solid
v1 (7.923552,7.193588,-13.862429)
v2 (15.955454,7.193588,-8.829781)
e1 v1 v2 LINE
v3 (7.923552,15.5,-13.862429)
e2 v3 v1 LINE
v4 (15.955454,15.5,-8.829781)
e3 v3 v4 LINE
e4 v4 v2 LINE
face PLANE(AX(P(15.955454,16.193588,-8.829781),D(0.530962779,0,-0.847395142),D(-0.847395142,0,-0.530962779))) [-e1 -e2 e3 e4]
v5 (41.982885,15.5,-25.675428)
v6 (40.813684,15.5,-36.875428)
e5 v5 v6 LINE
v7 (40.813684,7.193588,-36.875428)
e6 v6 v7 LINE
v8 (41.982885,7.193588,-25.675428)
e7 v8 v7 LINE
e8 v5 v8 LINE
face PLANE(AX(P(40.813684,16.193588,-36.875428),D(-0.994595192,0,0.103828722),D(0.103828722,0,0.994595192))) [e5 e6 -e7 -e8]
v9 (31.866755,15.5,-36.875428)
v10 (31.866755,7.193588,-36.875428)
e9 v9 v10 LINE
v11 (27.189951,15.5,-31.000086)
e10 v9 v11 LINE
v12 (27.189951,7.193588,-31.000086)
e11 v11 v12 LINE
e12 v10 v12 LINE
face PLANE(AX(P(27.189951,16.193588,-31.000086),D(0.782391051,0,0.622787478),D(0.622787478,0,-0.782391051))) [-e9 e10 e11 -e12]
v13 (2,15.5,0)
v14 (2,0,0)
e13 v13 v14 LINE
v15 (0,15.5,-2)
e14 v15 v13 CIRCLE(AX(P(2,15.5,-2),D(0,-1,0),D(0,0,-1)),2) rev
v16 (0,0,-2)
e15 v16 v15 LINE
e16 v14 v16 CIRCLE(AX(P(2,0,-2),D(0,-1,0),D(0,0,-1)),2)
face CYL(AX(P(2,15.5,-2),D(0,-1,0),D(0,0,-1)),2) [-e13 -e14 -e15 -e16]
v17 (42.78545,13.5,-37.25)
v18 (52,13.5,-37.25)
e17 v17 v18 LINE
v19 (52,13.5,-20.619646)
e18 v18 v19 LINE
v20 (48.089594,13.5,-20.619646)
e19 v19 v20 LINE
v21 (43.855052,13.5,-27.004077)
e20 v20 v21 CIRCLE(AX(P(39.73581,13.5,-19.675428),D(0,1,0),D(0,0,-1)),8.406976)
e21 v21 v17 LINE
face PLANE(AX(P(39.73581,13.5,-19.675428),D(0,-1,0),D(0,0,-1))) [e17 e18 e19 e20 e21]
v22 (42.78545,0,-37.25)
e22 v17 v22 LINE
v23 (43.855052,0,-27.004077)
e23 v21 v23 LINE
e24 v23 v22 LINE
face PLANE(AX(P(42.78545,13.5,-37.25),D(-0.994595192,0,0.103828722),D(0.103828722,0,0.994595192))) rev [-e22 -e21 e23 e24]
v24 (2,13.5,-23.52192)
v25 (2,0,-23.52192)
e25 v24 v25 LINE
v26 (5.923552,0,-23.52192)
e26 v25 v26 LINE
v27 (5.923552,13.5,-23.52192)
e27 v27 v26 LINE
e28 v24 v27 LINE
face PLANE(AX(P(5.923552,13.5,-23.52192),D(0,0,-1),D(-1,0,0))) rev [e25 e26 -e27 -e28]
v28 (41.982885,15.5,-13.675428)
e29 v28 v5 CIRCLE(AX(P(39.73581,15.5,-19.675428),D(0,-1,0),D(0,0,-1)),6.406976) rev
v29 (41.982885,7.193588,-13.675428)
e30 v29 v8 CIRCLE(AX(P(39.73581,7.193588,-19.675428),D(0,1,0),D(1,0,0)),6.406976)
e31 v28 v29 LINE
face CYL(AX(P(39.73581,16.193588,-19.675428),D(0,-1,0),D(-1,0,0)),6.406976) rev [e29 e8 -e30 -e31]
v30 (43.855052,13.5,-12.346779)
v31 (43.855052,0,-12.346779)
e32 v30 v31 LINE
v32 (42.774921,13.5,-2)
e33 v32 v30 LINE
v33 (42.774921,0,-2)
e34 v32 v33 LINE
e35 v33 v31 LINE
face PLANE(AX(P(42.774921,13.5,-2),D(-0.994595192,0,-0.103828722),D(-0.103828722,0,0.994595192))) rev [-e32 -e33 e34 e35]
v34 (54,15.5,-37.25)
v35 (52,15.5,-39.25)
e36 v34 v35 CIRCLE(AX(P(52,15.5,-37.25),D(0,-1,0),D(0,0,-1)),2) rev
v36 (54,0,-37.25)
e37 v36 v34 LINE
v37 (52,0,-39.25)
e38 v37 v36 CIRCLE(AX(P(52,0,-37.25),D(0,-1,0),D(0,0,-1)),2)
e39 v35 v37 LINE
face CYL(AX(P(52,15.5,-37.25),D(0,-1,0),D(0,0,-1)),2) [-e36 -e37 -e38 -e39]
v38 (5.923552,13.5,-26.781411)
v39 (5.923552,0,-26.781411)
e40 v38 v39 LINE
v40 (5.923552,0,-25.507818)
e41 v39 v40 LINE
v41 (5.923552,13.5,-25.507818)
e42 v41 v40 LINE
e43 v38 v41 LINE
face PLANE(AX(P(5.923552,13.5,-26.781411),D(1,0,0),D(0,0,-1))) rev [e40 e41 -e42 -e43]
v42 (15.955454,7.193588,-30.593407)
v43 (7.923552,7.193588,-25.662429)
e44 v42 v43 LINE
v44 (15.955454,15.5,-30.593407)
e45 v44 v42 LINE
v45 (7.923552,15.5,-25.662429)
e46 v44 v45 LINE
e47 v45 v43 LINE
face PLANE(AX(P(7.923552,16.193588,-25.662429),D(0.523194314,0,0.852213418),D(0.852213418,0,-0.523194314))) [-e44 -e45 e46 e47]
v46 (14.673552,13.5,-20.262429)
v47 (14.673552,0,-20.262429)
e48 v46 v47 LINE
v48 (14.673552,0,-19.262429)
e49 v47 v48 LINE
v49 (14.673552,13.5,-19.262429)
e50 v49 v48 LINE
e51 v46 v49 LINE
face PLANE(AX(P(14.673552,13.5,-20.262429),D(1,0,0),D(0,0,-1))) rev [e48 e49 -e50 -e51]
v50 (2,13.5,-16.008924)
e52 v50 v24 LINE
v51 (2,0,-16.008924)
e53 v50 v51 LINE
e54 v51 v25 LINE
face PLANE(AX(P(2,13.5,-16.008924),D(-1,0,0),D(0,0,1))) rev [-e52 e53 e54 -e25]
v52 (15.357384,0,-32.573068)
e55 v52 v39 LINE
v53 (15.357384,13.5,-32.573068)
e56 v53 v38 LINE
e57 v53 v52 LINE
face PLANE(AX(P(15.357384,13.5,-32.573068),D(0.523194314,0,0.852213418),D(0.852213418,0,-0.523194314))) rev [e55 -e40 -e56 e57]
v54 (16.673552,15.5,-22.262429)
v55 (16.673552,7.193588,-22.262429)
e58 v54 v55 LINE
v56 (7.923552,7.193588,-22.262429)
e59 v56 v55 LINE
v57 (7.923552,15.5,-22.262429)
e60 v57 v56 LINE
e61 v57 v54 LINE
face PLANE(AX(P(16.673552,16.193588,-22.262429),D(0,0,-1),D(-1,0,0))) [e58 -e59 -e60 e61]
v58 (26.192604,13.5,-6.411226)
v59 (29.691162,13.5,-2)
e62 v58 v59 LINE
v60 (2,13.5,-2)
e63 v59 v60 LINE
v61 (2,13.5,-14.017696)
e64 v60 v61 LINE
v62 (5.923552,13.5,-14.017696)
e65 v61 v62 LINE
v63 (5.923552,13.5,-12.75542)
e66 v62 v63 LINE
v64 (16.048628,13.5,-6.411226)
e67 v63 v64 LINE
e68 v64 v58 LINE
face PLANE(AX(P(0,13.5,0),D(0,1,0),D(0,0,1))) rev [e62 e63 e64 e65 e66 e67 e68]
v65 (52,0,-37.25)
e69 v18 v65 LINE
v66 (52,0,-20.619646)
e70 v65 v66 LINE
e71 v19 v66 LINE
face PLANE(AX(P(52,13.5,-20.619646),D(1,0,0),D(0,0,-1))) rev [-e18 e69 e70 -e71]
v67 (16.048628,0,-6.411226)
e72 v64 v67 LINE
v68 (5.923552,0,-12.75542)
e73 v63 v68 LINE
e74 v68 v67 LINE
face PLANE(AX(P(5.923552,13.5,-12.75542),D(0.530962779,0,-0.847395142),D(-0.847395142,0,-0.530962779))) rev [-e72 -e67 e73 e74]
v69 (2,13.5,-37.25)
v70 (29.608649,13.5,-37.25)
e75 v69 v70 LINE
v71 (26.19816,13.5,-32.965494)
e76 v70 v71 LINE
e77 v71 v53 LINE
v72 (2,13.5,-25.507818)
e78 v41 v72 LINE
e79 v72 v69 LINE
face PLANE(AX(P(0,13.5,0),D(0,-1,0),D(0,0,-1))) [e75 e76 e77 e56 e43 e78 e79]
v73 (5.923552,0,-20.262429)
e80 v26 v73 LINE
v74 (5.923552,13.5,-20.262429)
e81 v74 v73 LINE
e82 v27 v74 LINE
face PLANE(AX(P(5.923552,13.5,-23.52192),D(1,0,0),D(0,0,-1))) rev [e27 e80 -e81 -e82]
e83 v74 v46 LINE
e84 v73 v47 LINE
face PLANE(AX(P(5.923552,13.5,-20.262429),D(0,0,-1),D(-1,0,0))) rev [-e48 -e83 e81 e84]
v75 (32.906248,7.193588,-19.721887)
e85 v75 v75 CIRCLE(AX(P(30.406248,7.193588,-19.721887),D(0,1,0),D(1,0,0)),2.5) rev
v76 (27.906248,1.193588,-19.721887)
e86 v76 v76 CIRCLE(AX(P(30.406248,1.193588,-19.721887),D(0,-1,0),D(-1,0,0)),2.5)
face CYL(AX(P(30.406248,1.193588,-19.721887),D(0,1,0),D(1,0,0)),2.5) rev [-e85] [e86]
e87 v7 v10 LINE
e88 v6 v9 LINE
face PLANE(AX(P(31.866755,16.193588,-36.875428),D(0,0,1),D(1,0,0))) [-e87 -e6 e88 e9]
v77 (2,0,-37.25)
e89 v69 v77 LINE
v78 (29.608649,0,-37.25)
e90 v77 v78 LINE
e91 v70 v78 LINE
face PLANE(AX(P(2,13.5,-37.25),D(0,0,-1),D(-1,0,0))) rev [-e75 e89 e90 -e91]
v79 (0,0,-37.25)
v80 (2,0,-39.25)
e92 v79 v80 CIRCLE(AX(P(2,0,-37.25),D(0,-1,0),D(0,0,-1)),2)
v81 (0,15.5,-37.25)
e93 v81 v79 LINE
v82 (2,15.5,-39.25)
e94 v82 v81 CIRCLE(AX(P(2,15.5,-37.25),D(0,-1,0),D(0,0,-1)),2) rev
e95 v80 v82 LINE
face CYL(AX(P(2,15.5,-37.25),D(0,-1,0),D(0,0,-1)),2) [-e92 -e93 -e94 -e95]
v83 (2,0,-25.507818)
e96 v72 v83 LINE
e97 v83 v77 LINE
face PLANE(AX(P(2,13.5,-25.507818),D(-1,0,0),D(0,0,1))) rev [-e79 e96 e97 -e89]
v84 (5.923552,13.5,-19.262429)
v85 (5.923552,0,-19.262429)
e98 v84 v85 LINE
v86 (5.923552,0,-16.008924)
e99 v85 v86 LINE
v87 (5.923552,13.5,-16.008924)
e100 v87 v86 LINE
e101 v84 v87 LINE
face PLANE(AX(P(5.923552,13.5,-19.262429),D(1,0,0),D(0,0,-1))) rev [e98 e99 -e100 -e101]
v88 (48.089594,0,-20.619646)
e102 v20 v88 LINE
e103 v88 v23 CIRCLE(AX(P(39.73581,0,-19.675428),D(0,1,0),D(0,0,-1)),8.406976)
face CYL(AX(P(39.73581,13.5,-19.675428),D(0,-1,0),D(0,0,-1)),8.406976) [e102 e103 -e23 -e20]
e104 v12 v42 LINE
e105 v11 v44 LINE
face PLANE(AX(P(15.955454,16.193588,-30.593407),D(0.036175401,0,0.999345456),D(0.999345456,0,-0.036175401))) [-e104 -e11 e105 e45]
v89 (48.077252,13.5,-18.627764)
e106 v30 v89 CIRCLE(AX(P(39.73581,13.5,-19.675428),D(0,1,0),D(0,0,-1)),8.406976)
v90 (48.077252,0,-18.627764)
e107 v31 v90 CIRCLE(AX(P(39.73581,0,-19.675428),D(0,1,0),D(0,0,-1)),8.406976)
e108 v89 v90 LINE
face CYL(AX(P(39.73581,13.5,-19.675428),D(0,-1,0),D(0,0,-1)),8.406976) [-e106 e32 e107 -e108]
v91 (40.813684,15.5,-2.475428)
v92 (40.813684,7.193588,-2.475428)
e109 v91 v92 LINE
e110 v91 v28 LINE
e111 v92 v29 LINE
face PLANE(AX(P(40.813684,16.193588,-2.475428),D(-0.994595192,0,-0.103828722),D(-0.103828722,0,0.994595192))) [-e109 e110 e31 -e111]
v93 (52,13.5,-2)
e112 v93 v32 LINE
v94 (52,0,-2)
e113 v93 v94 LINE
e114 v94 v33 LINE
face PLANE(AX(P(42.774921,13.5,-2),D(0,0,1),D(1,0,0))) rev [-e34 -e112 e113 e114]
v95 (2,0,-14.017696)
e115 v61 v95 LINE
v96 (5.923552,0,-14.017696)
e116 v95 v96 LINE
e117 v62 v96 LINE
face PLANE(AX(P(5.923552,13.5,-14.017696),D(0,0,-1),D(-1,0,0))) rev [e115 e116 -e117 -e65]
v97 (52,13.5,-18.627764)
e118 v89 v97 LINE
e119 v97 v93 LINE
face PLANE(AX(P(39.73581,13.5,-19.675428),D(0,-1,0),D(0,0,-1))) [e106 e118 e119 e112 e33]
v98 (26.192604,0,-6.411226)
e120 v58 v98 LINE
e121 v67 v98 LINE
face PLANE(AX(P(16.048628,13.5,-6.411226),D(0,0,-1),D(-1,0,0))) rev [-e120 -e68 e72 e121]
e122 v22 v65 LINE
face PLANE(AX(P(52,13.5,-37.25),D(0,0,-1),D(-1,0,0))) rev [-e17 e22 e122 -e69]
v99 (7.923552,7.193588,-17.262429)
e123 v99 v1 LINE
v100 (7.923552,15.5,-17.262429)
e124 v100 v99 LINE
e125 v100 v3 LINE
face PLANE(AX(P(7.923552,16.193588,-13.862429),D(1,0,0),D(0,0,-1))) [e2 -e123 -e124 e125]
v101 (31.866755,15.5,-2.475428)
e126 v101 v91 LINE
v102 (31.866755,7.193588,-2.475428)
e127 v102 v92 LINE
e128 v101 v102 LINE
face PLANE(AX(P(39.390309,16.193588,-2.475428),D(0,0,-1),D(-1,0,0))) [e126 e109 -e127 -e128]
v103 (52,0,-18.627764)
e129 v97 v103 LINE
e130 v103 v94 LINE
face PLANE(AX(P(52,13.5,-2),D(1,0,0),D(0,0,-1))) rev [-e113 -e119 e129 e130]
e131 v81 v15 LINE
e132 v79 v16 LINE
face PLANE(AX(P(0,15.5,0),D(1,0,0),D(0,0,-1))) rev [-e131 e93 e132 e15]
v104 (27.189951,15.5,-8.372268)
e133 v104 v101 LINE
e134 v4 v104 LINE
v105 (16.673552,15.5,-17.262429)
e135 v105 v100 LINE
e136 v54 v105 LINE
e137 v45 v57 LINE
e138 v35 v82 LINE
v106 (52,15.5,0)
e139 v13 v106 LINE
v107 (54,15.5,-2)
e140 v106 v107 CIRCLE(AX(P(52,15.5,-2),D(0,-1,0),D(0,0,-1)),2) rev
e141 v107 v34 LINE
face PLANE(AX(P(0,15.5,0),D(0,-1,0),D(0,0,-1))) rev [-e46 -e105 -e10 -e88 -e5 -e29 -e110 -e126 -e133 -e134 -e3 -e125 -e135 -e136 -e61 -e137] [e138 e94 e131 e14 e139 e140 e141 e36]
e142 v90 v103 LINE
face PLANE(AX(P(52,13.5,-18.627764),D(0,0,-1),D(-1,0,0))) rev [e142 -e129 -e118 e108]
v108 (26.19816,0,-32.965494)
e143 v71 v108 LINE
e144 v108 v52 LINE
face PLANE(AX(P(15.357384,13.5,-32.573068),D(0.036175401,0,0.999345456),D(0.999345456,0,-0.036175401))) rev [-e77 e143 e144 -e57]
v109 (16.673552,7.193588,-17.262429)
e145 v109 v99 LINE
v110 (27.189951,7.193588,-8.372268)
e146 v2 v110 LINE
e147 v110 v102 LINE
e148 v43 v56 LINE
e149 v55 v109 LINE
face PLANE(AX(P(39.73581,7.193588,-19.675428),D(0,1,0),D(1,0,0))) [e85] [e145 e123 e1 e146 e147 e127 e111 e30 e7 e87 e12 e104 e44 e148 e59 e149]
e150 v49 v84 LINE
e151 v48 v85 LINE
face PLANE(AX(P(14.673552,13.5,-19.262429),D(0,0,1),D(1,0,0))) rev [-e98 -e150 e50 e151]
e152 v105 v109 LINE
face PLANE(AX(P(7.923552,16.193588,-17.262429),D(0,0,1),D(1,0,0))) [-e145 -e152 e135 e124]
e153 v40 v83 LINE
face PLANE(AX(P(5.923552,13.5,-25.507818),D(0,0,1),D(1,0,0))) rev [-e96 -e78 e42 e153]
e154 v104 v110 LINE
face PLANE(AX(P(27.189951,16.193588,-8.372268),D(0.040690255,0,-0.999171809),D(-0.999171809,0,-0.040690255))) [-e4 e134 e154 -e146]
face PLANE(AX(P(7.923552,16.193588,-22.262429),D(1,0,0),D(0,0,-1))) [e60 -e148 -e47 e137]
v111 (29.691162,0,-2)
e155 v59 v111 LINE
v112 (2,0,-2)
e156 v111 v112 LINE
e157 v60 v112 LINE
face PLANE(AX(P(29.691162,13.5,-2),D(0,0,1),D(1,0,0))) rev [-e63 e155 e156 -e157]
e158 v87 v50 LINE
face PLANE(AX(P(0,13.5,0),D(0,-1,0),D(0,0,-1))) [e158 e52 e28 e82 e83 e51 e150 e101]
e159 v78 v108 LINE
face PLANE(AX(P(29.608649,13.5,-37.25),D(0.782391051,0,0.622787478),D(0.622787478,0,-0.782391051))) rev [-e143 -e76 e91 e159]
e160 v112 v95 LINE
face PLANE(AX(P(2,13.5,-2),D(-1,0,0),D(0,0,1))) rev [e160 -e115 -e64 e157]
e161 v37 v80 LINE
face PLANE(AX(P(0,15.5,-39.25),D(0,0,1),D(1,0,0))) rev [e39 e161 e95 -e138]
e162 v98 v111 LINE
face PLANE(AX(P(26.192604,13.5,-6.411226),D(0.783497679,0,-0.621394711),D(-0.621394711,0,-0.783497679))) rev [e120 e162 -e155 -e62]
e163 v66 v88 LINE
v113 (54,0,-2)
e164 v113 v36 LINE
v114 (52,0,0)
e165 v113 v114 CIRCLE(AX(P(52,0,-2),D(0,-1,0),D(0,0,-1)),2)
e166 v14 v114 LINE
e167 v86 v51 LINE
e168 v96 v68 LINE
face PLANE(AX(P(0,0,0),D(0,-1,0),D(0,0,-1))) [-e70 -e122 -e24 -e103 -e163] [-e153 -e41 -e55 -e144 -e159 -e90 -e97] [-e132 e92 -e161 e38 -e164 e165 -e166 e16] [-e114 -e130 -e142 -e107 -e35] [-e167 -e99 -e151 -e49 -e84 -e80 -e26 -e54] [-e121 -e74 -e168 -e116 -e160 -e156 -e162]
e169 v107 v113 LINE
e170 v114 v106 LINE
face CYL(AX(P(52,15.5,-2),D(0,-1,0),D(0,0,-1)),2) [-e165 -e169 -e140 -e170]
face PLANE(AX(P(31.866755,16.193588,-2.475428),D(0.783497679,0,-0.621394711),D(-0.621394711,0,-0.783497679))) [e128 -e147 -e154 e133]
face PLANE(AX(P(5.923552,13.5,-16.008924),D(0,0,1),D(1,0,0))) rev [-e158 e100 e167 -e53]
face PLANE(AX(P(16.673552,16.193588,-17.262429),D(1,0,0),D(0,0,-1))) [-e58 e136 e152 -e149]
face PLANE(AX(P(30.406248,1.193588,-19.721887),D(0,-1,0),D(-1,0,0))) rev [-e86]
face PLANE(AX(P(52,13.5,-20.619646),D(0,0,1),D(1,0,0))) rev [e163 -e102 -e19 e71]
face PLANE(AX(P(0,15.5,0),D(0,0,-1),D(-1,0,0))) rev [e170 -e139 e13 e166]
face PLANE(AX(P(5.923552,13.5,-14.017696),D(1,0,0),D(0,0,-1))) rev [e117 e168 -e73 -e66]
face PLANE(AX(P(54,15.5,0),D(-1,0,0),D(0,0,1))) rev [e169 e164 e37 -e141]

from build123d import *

# Parameters (mm, degrees)
SKETCH1_W              = 54
SKETCH1_H              = 39.25
BOSS_EXTRUDE1_DEPTH    = 15.5
FILLET1_R              = 2
FILLET2_R              = 2
M3_A_START             = -3.329776532
M3_A_BLANK_DEPTH       = 9
M3_A_START_2           = -9.329776532
M3_A_BLANK_2_OUTLINE_R = 2.5
M3_A_BLANK_2_DEPTH     = 6
BODY_MOVE_COPY6_ANGLE  = 90
CUT_EXTRUDE1_DEPTH     = 13.5


with BuildPart() as part:
    # Sketch1 → Boss-Extrude1 (new body)
    with BuildSketch(Plane(origin=(0, 0, 0), x_dir=(1, 0, 0), z_dir=(0, 1, 0))):
        with Locations((27, 19.625)):
            Rectangle(SKETCH1_W, SKETCH1_H)
    extrude(amount=BOSS_EXTRUDE1_DEPTH)

    # Fillet1
    fillet1_edges = [part.edges().sort_by_distance(p)[0] for p in [
        (0, 7.75, 0),
    ]]
    fillet(fillet1_edges, radius=FILLET1_R)

    # Fillet2
    fillet2_edges = [part.edges().sort_by_distance(p)[0] for p in [
        (0, 7.75, -39.25),
        (54, 7.75, -39.25),
        (54, 7.75, 0),
    ]]
    fillet(fillet2_edges, radius=FILLET2_R)


with BuildPart() as body_2:
    # M3-A Blank: read off the stored shape, not the designer's step
    # M3-A Blank outline → M3-A Blank (new body)
    with BuildSketch(Plane(origin=(0, 0, 0), x_dir=(1, 0, 0), z_dir=(0, 1, 0)).offset(M3_A_START)):
        with BuildLine():
            Line((-41.581939277, 43.861919588), (-30.381939277, 42.692718591))
            ThreePointArc((-30.381939277, 42.692718591), (-24.381939277, 38.532817401), (-18.381939277, 42.692718591))
            Line((-18.381939277, 42.692718591), (-7.181939277, 43.861919588))
            Line((-7.181939277, 43.861919588), (-7.181939277, 52.808848959))
            Line((-7.181939277, 52.808848959), (-13.057281533, 57.485652948))
            Line((-13.057281533, 57.485652948), (-13.463960141, 68.720149487))
            Line((-13.463960141, 68.720149487), (-18.39493826, 76.75205199))
            Line((-18.39493826, 76.75205199), (-21.79493826, 76.75205199))
            Line((-21.79493826, 76.75205199), (-21.79493826, 68.00205199))
            Line((-21.79493826, 68.00205199), (-26.79493826, 68.00205199))
            Line((-26.79493826, 68.00205199), (-26.79493826, 76.75205199))
            Line((-26.79493826, 76.75205199), (-30.19493826, 76.75205199))
            Line((-30.19493826, 76.75205199), (-35.227586031, 68.720149487))
            Line((-35.227586031, 68.720149487), (-35.685099465, 57.485652948))
            Line((-35.685099465, 57.485652948), (-41.581939277, 52.808848959))
            Line((-41.581939277, 52.808848959), (-41.581939277, 43.861919588))
        make_face()
    extrude(amount=M3_A_BLANK_DEPTH)

    # M3-A Blank 2 outline → M3-A Blank 2 (add)
    with BuildSketch(Plane(origin=(0, 0, 0), x_dir=(1, 0, 0), z_dir=(0, 1, 0)).offset(M3_A_START_2)):
        with Locations((-24.335480832, 54.269355582)):
            Circle(M3_A_BLANK_2_OUTLINE_R)
    extrude(amount=M3_A_BLANK_2_DEPTH)


with BuildPart() as body_2_1:
    # Body-Move/Copy4: moved
    add(body_2.part.moved(Location((42.5, 8.919688157, 37.96700657))))


with BuildPart() as body_2_2:
    # Body-Move/Copy5: moved
    add(body_2_1.part.moved(Location((8.915108254, 0, 0))))


with BuildPart() as body_2_3:
    # Body-Move/Copy6: moved
    add(body_2_2.part.rotate(Axis((27.033168977, 0, -19.675428126), (0, 1, 0)), BODY_MOVE_COPY6_ANGLE))


with BuildPart() as body_2_4:
    # Body-Move/Copy7: moved
    add(body_2_3.part.moved(Location((0, 1.103676274, 0))))


with BuildPart() as body_2_5:
    # Body-Move/Copy8: moved
    add(body_2_4.part.moved(Location((0, 0.5, 0))))


with BuildPart() as part_1:
    add(part.part)

    # Intersect1: read off the stored shape, not the designer's step
    # Intersect1: cut body 2
    add(body_2_5.part, mode=Mode.SUBTRACT)

    # Sketch3 → Cut-Extrude1 (cut)
    with BuildSketch(Plane(origin=(0, 0, 0), x_dir=(-1, 0, 0), z_dir=(0, -1, 0))):
        Polygon((-5.923551682, 12.755419679), (-16.048628272, 6.41122612), (-26.192603819, 6.41122612), (-29.691162465, 2), (-2, 2), (-2, 14.017695962), (-5.923551682, 14.017695962), align=None)
        Polygon((-2, 37.25), (-29.60864948, 37.25), (-26.198159594, 32.965493874), (-15.357384062, 32.57306761), (-5.923551682, 26.781411023), (-5.923551682, 25.507817982), (-2, 25.507817982), align=None)
        Polygon((-5.923551682, 20.262429143), (-14.673551682, 20.262429143), (-14.673551682, 19.262429143), (-5.923551682, 19.262429143), (-5.923551682, 16.008924411), (-2, 16.008924411), (-2, 23.521920083), (-5.923551682, 23.521920083), align=None)
        with BuildLine():
            Line((-42.774921098, 2), (-52, 2))
            Line((-52, 2), (-52, 18.627764364))
            Line((-52, 18.627764364), (-48.077251764, 18.627764364))
            ThreePointArc((-48.077251764, 18.627764364), (-46.712904885, 14.985289801), (-43.85505184, 12.346778986))
            Line((-43.85505184, 12.346778986), (-42.774921098, 2))
        make_face()
        with BuildLine():
            Line((-52, 37.25), (-42.78544978, 37.25))
            Line((-42.78544978, 37.25), (-43.85505184, 27.004077266))
            ThreePointArc((-43.85505184, 27.004077266), (-46.741831066, 24.322246322), (-48.089593706, 20.619646239))
            Line((-48.089593706, 20.619646239), (-52, 20.619646239))
            Line((-52, 20.619646239), (-52, 37.25))
        make_face()
    extrude(amount=-CUT_EXTRUDE1_DEPTH, mode=Mode.SUBTRACT)


solid = part_1.part
